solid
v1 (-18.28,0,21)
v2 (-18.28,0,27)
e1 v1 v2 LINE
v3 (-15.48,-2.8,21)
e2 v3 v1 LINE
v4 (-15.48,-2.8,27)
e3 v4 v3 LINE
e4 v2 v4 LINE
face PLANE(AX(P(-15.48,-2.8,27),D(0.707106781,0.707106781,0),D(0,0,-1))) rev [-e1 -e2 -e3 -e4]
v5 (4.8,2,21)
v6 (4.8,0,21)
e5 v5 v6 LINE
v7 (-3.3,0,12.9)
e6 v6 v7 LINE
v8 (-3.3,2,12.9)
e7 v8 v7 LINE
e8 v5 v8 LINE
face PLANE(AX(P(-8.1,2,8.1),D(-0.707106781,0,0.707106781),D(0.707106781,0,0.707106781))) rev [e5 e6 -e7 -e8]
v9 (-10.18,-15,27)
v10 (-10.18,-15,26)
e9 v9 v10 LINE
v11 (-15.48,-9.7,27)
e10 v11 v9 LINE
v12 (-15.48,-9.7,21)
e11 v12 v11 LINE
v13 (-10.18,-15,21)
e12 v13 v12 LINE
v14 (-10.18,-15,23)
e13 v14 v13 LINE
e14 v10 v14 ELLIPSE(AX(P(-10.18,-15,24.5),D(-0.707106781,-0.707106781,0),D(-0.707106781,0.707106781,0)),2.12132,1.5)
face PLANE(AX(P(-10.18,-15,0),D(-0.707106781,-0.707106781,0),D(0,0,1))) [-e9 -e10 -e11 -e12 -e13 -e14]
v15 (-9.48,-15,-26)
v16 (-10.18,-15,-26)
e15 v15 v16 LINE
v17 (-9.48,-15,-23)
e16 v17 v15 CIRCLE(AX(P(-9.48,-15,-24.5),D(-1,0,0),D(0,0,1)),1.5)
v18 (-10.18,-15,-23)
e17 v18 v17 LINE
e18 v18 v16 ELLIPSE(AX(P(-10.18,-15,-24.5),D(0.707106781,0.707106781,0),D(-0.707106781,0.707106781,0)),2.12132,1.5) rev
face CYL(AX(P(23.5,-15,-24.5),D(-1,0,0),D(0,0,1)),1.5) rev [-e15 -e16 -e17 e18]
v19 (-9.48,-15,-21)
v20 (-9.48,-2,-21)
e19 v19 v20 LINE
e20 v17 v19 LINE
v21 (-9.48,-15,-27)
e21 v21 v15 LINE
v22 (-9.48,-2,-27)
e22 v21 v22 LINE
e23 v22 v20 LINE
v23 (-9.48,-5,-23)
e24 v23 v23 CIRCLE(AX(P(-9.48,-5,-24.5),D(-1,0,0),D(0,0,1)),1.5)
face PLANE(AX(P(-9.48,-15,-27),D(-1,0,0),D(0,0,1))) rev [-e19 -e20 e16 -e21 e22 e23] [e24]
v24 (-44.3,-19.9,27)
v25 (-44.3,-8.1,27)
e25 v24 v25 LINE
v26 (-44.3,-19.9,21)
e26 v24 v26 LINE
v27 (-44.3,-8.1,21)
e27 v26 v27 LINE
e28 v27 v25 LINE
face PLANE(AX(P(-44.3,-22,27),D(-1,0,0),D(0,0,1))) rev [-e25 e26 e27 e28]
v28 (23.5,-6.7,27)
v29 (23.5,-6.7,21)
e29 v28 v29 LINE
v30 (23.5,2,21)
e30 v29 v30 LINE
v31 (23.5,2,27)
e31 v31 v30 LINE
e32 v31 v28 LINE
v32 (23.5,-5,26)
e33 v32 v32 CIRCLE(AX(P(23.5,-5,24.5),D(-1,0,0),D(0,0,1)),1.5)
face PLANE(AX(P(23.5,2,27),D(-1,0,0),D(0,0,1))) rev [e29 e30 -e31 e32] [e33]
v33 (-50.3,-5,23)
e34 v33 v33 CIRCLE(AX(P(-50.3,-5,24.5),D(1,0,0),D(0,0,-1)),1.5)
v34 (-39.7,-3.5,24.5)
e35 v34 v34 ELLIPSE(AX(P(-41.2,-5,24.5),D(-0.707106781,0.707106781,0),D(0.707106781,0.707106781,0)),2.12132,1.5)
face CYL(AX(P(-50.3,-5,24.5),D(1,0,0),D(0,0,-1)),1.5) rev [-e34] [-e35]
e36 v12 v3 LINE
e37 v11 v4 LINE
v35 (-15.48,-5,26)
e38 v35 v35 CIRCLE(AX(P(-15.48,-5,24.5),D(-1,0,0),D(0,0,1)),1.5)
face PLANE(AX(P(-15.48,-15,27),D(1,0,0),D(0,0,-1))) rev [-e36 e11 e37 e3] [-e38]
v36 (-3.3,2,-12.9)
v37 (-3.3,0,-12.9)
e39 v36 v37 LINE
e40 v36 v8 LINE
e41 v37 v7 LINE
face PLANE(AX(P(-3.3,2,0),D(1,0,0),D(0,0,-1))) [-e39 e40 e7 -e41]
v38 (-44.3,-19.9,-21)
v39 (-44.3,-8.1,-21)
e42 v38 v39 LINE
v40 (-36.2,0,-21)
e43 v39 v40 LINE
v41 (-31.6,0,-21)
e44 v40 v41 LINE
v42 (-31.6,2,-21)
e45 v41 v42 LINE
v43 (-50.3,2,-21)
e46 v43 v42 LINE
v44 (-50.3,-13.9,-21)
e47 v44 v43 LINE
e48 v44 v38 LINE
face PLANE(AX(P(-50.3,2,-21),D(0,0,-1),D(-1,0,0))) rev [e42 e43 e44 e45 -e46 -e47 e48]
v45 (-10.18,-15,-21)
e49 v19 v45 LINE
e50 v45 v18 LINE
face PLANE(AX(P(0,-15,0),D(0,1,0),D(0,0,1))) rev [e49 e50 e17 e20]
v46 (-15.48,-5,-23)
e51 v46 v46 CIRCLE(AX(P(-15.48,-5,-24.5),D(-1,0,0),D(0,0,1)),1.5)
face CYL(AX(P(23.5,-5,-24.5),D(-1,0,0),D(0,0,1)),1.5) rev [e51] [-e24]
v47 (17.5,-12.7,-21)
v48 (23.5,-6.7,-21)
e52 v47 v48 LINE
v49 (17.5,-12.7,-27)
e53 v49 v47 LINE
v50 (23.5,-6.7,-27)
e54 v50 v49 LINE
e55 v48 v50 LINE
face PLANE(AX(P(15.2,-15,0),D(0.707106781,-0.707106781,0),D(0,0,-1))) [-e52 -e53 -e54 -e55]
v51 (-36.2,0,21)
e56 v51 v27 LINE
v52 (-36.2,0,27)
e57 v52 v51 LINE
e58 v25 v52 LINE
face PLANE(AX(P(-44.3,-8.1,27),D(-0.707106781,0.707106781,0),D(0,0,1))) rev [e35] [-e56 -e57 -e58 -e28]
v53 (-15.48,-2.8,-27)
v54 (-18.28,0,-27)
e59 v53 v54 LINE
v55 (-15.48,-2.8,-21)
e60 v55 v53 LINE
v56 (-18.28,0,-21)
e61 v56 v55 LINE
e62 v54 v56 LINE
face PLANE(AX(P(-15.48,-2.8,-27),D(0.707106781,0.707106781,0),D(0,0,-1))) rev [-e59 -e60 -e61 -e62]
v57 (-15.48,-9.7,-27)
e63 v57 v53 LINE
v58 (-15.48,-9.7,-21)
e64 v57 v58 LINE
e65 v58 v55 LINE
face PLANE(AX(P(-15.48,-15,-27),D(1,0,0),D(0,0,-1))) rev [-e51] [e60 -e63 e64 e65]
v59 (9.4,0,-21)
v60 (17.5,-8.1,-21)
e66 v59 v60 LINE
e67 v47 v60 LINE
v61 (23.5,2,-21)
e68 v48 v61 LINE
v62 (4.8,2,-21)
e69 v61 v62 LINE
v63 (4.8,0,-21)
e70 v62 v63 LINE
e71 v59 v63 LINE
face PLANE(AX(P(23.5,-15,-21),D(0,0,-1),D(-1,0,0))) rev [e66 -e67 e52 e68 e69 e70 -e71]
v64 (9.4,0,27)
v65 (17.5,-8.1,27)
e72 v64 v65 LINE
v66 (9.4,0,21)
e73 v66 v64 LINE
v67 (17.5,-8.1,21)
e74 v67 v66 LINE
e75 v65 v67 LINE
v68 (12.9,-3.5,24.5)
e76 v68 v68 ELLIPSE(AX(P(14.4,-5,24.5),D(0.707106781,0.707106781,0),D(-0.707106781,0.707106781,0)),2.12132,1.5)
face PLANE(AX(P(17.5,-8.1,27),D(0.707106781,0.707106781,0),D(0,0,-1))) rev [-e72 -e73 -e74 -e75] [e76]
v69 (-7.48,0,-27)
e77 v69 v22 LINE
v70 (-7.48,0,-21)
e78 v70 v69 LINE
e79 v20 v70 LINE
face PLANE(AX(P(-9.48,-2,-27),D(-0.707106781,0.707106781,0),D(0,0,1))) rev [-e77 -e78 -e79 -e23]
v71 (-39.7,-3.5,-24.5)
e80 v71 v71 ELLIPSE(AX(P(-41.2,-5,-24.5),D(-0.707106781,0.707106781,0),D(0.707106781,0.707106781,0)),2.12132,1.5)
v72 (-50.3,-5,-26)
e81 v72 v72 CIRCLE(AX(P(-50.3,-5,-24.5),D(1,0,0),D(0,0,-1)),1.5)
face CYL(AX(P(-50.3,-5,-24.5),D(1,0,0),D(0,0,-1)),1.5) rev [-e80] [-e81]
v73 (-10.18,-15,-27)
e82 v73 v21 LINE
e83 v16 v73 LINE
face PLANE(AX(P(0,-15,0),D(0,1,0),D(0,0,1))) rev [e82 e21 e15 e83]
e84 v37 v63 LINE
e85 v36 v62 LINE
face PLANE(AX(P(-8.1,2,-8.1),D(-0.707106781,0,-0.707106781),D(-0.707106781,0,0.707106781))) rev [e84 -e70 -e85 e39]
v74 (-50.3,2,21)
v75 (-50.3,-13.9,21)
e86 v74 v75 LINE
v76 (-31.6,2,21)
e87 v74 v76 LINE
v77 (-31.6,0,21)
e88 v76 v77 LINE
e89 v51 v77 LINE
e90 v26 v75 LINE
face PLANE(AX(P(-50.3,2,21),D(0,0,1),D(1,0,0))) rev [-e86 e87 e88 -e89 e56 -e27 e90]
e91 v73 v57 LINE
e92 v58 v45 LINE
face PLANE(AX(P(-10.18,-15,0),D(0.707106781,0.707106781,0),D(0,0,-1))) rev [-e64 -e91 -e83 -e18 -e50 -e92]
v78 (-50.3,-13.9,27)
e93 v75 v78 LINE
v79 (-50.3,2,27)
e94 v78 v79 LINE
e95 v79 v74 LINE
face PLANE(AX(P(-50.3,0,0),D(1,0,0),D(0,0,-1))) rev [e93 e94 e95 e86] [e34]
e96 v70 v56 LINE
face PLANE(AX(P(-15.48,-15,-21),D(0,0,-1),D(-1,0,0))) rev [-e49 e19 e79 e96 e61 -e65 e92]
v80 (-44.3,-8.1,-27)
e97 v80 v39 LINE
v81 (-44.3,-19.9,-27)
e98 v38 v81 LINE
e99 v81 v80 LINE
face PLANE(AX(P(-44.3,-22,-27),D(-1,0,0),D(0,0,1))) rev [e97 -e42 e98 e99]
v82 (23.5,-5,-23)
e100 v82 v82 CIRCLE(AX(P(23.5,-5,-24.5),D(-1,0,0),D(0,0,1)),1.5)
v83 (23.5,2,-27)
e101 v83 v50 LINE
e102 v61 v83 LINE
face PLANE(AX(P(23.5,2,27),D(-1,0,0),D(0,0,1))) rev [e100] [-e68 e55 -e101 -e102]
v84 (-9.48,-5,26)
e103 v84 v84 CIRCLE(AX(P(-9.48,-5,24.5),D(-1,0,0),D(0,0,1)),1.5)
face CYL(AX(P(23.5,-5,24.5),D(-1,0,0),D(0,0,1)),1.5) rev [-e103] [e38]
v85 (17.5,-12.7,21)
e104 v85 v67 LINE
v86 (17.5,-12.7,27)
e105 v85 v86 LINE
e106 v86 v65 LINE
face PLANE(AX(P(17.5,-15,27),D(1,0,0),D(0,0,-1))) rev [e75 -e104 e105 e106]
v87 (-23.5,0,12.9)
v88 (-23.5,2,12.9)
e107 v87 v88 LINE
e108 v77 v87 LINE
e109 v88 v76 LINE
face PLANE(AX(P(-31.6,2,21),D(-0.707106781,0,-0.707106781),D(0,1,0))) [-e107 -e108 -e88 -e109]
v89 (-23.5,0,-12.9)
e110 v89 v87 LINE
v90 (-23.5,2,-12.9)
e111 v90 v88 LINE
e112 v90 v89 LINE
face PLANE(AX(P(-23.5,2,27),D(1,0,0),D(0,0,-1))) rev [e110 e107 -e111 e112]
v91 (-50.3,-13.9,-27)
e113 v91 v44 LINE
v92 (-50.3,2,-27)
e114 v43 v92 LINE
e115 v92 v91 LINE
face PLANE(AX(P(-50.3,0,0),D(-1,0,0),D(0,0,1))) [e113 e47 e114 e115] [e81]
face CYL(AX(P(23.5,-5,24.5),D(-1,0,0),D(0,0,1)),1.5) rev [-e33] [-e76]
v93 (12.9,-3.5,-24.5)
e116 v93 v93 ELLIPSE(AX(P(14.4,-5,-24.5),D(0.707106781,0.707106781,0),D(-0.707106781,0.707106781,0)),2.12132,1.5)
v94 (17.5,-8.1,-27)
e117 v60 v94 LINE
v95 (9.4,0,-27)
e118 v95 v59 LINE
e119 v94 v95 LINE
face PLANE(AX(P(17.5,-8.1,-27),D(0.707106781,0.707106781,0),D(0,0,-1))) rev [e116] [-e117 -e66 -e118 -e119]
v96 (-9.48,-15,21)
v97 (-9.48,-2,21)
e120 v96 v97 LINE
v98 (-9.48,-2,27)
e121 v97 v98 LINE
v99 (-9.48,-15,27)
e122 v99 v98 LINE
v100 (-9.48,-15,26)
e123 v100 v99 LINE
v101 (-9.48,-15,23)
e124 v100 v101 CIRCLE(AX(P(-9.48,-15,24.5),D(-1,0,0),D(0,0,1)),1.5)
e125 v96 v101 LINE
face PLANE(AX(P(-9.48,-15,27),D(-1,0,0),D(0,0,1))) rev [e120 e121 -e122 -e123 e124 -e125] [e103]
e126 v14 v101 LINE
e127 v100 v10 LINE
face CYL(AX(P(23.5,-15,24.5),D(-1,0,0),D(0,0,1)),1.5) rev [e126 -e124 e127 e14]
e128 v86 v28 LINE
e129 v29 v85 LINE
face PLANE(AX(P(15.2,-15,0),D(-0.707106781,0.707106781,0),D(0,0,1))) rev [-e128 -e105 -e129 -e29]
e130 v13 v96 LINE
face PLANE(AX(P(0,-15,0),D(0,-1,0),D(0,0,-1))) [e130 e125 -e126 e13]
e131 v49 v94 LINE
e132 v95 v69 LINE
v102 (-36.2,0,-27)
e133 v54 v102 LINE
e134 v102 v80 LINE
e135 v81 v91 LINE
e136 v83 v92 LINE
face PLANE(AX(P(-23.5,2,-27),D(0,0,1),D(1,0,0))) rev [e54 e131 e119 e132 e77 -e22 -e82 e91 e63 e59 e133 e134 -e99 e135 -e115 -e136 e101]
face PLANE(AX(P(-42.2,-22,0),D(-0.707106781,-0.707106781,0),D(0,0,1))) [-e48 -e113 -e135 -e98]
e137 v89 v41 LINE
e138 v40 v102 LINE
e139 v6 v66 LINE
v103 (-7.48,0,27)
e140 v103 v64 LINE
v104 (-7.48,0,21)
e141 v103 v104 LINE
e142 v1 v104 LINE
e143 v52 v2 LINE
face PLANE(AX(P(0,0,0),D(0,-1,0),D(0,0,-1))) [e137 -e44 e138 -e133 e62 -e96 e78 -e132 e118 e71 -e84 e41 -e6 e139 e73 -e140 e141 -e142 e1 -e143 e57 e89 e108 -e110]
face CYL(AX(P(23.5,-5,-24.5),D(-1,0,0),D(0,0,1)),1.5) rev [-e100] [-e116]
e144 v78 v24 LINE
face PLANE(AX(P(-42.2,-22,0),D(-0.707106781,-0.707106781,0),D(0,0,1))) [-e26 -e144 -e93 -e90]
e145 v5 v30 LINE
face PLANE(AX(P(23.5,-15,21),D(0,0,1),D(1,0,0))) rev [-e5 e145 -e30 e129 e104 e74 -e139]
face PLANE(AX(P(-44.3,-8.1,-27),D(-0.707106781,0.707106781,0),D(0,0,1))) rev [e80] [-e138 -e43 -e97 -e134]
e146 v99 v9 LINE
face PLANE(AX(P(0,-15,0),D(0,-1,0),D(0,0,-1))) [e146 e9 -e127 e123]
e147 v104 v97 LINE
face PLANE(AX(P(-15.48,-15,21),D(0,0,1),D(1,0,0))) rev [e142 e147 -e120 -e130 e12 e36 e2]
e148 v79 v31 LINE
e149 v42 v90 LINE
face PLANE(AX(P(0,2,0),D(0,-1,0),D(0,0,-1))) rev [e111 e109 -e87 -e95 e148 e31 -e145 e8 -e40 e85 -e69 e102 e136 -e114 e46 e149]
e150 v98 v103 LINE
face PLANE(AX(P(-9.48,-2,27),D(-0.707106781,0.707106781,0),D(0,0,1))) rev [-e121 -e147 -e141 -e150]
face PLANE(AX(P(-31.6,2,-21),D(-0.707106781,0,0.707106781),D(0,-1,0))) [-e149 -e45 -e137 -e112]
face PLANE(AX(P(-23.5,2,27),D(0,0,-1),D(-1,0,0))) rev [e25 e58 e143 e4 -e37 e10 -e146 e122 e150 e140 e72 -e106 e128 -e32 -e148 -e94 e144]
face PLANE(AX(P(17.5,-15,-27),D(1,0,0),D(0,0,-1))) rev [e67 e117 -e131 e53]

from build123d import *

# Parameters (mm, degrees)
SKETCH1_W               = 47
SKETCH1_H               = 54
BOSS_EXTRUDE1_DEPTH     = 2
SKETCH2_W               = 6
SKETCH2_H               = 6
BOSS_EXTRUDE2_DEPTH     = 15
CHAMFER1_SIZE           = 5.3
CHAMFER2_SIZE           = 8.3
SKETCH3_R               = 1.5
CUT_EXTRUDE1_DEPTH      = 50.733694815
CHAMFER3_SIZE           = 2.8
CHAMFER4_SIZE           = 2
SKETCH4_W               = 6
SKETCH4_H               = 2
BOSS_EXTRUDE3_DEPTH     = 26.8
SKETCH6_W               = 6
SKETCH6_H               = 6
BOSS_EXTRUDE4_DEPTH     = 22
CHAMFER5_SIZE           = 8.1
CUT_EXTRUDE2_DEPTH      = 61.457423035
CHAMFER6_SIZE           = 8.1
CUT_EXTRUDE3_DEPTH      = 53.832588428
CUT_EXTRUDE3_DEPTH_BACK = 53.832588428
SKETCH8_R               = 1.5


with BuildPart() as part:
    # Sketch1 → Boss-Extrude1 (new body)
    with BuildSketch(Plane(origin=(0, 0, 0), x_dir=(1, 0, 0), z_dir=(0, 1, 0))):
        Rectangle(SKETCH1_W, SKETCH1_H)
    extrude(amount=BOSS_EXTRUDE1_DEPTH)

    # Sketch2 → Boss-Extrude2 (add)
    with BuildSketch(Plane.XZ):
        with Locations((-12.48, 24)):
            Rectangle(SKETCH2_W, SKETCH2_H)
        with Locations((20.5, 24)):
            Rectangle(SKETCH2_W, SKETCH2_H)
        with Locations((20.5, -24)):
            Rectangle(SKETCH2_W, SKETCH2_H)
        with Locations((-12.48, -24)):
            Rectangle(SKETCH2_W, SKETCH2_H)
    extrude(amount=BOSS_EXTRUDE2_DEPTH)

    # Chamfer1
    chamfer1_edges = [part.edges().sort_by_distance(p)[0] for p in [
        (-15.48, -15, 24),
        (-15.48, -15, -24),
    ]]
    chamfer(chamfer1_edges, length=CHAMFER1_SIZE)

    # Chamfer2
    # the kernel refuses this chamfer: 8.3 mm, written as the material it takes off along each edge
    with BuildSketch(Plane(origin=(23.5, -15, 0.3449688), x_dir=(0.027495876610586414, 0.9996219169112966, 0), z_dir=(0, 0, -1)), Plane(origin=(23.5, -15, -0.3449688), x_dir=(-0.9996219169112969, -0.027495876610586417, 0), z_dir=(0, 0, 1))) as chamfer2_piece_1:
        Polygon((CHAMFER2_SIZE * 0.999621916911, -CHAMFER2_SIZE * 0.0274958766106), (-CHAMFER2_SIZE * 0.0274958766106, -CHAMFER2_SIZE * 0.999621916911), (0, 0), align=None)
    extrude(amount=48.6899376, mode=Mode.SUBTRACT)

    # Sketch3 → Cut-Extrude1 (cut, through all)
    with BuildSketch(Plane.ZY.offset(15.48)):
        with Locations((24.5, -5)):
            Circle(SKETCH3_R)
        with Locations((-24.5, -5)):
            Circle(SKETCH3_R)
        with Locations((24.5, -15)):
            Circle(SKETCH3_R)
        with Locations((-24.5, -15)):
            Circle(SKETCH3_R)
    extrude(amount=-CUT_EXTRUDE1_DEPTH, mode=Mode.SUBTRACT)

    # Chamfer3
    chamfer3_edges = [part.edges().sort_by_distance(p)[0] for p in [
        (-15.48, 0, 24),
        (-15.48, 0, -24),
    ]]
    chamfer(chamfer3_edges, length=CHAMFER3_SIZE)

    # Chamfer4
    chamfer4_edges = [part.edges().sort_by_distance(p)[0] for p in [
        (-9.48, 0, 24),
        (-9.48, 0, -24),
    ]]
    chamfer(chamfer4_edges, length=CHAMFER4_SIZE)

    # Sketch4 → Boss-Extrude3 (add)
    with BuildSketch(Plane.ZY.offset(23.5)):
        with Locations((24, 1)):
            Rectangle(SKETCH4_W, SKETCH4_H)
        with Locations((-24, 1)):
            Rectangle(SKETCH4_W, SKETCH4_H)
    extrude(amount=BOSS_EXTRUDE3_DEPTH)

    # Sketch6 → Boss-Extrude4 (add)
    with BuildSketch(Plane.XZ):
        with Locations((-47.3, 24)):
            Rectangle(SKETCH6_W, SKETCH6_H)
        with Locations((-47.3, -24)):
            Rectangle(SKETCH6_W, SKETCH6_H)
    extrude(amount=BOSS_EXTRUDE4_DEPTH)

    # Chamfer5
    # the kernel refuses this chamfer: 8.1 mm, written as the material it adds along each edge
    with BuildSketch(Plane(origin=(-23.5, 2, 21), x_dir=(0.027495876610586174, 0, -0.9996219169112968), z_dir=(0, -1, 0)), Plane(origin=(-23.5, 2, -21), x_dir=(-0.9996219169112968, 0, -0.02749587661058618), z_dir=(0, -1, 0))) as chamfer5_piece_1:
        Polygon((CHAMFER5_SIZE * 0.999621916911, -CHAMFER5_SIZE * 0.0274958766106), (-CHAMFER5_SIZE * 0.0274958766106, -CHAMFER5_SIZE * 0.999621916911), (0, 0), align=None)
    extrude(amount=2)
    with BuildSketch(Plane(origin=(-44.3, 0, 27), x_dir=(-0.027495876610586608, -0.9996219169112968, 0), z_dir=(0, 0, -1))) as chamfer5_piece_2:
        Polygon((CHAMFER5_SIZE * 0.999621916911, -CHAMFER5_SIZE * 0.0274958766106), (-CHAMFER5_SIZE * 0.0274958766106, -CHAMFER5_SIZE * 0.999621916911), (0, 0), align=None)
    extrude(amount=6)
    with BuildSketch(Plane(origin=(-44.3, 0, -27), x_dir=(-0.027495876610586608, -0.9996219169112968, 0), z_dir=(0, 0, 1))) as chamfer5_piece_3:
        Polygon((CHAMFER5_SIZE * 0.999621916911, CHAMFER5_SIZE * 0.0274958766106), (-CHAMFER5_SIZE * 0.0274958766106, CHAMFER5_SIZE * 0.999621916911), (0, 0), align=None)
    extrude(amount=6)
    # the kernel refuses this chamfer: 8.1 mm, written as the material it takes off along each edge
    with BuildSketch(Plane(origin=(-50.3, -22, 0.169367797), x_dir=(0.9996219169112968, -0.027495876610586167, 0), z_dir=(0, 0, 1)), Plane(origin=(-50.3, -22, -0.169367797), x_dir=(-0.027495876610586608, 0.9996219169112968, 0), z_dir=(0, 0, -1))) as chamfer5_2_piece_1:
        Polygon((CHAMFER5_SIZE * 0.999621916911, CHAMFER5_SIZE * 0.0274958766106), (-CHAMFER5_SIZE * 0.0274958766106, CHAMFER5_SIZE * 0.999621916911), (0, 0), align=None)
    extrude(amount=47.661264405, mode=Mode.SUBTRACT)

    # Sketch7 → Cut-Extrude2 (cut, through all)
    with BuildSketch(Plane.XZ):
        Polygon((9.4, 21), (17.5, 21), (23.5, 21), (23.5, -21), (17.5, -21), (9.4, -21), (4.8, -21), (-3.3, -12.9), (-3.3, 12.9), (4.8, 21), align=None)
    extrude(amount=-CUT_EXTRUDE2_DEPTH, mode=Mode.SUBTRACT)

    # Chamfer6
    # the kernel refuses this chamfer: 8.1 mm, written as the material it adds along each edge
    with BuildSketch(Plane(origin=(17.5, 0, 27), x_dir=(0.02749587661058618, -0.9996219169112968, 0), z_dir=(0, 0, -1))) as chamfer6_piece_1_section:
        Polygon((CHAMFER6_SIZE * 0.999621916911, CHAMFER6_SIZE * 0.0274958766106), (-CHAMFER6_SIZE * 0.0274958766106, CHAMFER6_SIZE * 0.999621916911), (0, 0), align=None)
    chamfer6_piece_1 = extrude(amount=6, mode=Mode.PRIVATE)
    chamfer6_piece_1 = chamfer6_piece_1 - Plane(origin=(14.692276243, -5, 24.5), x_dir=(0, 0, 1), z_dir=(-1, 0, 0)) * Cylinder(1.5, 45, mode=Mode.PRIVATE)
    add(chamfer6_piece_1)
    with BuildSketch(Plane(origin=(17.5, 0, -27), x_dir=(0.02749587661058618, -0.9996219169112968, 0), z_dir=(0, 0, 1))) as chamfer6_piece_2_section:
        Polygon((CHAMFER6_SIZE * 0.999621916911, -CHAMFER6_SIZE * 0.0274958766106), (-CHAMFER6_SIZE * 0.0274958766106, -CHAMFER6_SIZE * 0.999621916911), (0, 0), align=None)
    chamfer6_piece_2 = extrude(amount=6, mode=Mode.PRIVATE)
    chamfer6_piece_2 = chamfer6_piece_2 - Plane(origin=(14.692276222, -5, -24.5), x_dir=(0, 0, 1), z_dir=(-1, 0, 0)) * Cylinder(1.5, 45, mode=Mode.PRIVATE)
    add(chamfer6_piece_2)

    # Sketch8 → Cut-Extrude3 (cut, two sides: drawn at the far end of the back side and taken through both)
    with BuildSketch(Plane(origin=(-9.48, 0, 0), x_dir=(0, 0, -1), z_dir=(1, 0, 0)).offset(-CUT_EXTRUDE3_DEPTH_BACK)):
        with Locations(Location((-24.5, -5, 0), (0, 0, 180))):
            Circle(SKETCH8_R)
        with Locations(Location((24.5, -5, 0), (0, 0, 180))):
            Circle(SKETCH8_R)
    extrude(amount=CUT_EXTRUDE3_DEPTH + CUT_EXTRUDE3_DEPTH_BACK, mode=Mode.SUBTRACT)


solid = part.part
